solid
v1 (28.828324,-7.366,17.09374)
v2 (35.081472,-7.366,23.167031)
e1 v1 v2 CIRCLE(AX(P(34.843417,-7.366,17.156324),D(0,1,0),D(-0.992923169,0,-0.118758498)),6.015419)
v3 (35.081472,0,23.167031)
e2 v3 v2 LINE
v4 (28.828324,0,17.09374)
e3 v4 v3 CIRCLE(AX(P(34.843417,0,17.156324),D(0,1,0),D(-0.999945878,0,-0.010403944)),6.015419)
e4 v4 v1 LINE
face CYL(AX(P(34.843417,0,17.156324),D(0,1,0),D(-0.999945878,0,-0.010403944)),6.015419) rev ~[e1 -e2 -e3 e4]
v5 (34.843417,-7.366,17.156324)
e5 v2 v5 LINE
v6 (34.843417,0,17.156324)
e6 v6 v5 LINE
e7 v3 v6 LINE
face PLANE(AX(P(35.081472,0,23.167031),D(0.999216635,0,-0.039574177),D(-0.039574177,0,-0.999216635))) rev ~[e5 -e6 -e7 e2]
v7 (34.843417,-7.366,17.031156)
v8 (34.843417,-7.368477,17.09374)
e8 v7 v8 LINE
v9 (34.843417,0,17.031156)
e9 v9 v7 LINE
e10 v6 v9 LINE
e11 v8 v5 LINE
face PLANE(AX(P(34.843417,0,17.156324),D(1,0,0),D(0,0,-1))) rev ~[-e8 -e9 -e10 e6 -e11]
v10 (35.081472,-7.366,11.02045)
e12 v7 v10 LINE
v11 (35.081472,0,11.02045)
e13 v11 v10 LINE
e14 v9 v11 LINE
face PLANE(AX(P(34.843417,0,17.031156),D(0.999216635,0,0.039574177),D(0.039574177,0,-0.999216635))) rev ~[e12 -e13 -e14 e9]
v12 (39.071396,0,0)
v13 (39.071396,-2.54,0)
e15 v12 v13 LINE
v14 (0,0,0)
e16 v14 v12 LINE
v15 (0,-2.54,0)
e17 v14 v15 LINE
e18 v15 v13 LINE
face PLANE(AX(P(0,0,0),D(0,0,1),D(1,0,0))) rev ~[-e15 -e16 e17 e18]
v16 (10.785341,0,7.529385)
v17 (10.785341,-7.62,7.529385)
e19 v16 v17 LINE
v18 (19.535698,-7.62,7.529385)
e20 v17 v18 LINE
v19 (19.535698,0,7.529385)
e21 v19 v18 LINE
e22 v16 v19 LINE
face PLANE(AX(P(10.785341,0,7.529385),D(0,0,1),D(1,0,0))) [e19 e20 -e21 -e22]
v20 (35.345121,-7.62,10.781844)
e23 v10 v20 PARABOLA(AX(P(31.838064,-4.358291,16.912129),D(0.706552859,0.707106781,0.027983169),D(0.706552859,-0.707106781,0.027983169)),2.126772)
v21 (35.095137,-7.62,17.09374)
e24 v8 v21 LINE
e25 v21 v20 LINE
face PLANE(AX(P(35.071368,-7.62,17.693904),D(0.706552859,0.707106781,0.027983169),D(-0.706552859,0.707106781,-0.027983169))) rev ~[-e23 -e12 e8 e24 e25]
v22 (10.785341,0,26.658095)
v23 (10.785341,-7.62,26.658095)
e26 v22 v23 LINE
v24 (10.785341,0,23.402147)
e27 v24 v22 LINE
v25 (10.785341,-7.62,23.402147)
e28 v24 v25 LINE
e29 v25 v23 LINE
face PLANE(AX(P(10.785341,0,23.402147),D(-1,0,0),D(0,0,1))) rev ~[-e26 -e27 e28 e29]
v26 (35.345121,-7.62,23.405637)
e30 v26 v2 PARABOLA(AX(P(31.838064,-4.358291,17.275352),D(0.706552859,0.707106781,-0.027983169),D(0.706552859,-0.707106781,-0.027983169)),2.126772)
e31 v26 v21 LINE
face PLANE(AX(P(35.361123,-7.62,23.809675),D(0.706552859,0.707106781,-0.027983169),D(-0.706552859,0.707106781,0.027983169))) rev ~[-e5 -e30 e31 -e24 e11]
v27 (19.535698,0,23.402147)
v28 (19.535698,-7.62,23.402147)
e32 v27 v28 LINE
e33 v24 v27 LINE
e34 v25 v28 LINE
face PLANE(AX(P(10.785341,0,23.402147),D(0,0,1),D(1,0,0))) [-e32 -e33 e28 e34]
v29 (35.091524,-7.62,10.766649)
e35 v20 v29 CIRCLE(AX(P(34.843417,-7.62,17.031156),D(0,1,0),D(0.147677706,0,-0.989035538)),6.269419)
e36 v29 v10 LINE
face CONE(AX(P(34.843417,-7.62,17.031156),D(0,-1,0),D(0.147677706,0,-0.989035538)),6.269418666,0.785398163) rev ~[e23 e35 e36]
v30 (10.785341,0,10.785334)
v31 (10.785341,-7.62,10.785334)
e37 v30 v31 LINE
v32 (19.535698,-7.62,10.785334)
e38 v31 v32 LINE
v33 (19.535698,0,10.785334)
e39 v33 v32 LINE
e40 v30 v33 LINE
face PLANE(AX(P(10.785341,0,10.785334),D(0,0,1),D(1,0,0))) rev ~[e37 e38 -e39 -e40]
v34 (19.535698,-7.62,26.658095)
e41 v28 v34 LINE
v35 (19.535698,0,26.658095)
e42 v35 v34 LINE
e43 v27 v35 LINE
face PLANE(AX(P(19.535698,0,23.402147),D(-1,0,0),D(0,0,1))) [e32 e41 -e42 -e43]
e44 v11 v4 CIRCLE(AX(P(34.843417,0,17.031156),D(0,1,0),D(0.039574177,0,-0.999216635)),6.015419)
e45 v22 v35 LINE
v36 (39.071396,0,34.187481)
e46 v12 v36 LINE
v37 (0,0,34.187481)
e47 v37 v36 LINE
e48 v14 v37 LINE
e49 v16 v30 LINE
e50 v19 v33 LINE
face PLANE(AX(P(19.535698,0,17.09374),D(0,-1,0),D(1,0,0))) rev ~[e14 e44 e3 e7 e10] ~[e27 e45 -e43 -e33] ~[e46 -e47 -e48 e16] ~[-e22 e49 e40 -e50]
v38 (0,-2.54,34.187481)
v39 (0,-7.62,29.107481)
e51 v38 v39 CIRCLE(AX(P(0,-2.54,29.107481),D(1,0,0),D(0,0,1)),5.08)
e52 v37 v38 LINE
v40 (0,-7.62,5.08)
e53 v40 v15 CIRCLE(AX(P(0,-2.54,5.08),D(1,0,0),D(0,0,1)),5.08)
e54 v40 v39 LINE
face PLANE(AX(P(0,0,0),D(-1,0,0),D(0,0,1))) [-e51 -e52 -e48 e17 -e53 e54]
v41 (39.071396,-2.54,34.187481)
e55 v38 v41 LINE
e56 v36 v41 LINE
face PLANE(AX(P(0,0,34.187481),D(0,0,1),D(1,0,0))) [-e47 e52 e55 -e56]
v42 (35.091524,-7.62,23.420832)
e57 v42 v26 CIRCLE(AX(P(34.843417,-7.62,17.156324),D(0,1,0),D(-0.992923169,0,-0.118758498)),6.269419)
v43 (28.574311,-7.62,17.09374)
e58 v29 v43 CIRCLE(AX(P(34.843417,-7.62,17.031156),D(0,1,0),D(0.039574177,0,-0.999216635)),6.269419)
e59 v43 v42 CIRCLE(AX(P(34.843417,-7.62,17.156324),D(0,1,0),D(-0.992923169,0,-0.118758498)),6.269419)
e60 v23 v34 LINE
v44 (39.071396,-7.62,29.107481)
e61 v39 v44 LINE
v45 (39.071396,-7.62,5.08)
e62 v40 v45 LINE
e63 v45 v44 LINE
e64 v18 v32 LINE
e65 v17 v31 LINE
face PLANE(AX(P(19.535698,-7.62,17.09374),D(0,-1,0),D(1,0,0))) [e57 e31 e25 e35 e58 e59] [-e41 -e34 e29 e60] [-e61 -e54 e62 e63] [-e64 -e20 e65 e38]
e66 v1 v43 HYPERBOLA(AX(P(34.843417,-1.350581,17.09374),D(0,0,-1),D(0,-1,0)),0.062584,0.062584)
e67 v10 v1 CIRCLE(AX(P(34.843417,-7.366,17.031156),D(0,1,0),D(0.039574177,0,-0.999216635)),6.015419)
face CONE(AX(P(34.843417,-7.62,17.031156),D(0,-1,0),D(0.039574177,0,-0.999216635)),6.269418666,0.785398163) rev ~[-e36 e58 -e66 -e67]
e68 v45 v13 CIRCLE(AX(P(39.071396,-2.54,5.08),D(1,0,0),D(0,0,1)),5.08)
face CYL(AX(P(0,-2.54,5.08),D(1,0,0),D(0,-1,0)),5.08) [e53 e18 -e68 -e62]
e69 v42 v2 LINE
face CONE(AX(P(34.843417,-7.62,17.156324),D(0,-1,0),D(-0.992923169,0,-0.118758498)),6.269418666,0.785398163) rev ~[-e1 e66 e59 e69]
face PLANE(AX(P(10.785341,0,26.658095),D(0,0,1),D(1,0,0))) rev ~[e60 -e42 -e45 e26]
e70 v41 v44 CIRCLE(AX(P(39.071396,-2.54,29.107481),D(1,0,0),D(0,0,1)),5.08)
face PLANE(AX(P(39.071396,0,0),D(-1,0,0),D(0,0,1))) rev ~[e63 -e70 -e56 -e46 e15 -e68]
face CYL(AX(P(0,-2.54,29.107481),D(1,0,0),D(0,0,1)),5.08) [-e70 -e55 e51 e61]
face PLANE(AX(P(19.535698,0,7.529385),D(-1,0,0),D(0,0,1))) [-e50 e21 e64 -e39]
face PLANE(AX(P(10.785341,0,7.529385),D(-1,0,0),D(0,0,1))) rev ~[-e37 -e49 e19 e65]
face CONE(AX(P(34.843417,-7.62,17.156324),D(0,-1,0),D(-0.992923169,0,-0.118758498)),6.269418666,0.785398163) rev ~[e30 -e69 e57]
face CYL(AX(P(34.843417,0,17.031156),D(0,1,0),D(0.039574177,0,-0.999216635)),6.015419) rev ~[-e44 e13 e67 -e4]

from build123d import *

# Parameters (mm, degrees)
F0_W         = 39.0713959932
F0_H         = 34.1874808073
F0_W_2       = 8.7503567338
F0_H_2       = 3.2559484243
F1_DEPTH     = 7.62
F2_R         = 5.08
F3_R         = 5.08
F4_T2_ANGLE  = 99.0884829953
F4_T4_ANGLE  = 99.0884829953
F4_T8_DEPTH  = 7.3218336241
F4_S9_R      = 6.0154186662
F4_T10_DEPTH = 5
F4_T14_DEPTH = 7.3218336241
F4_S15_R     = 6.0154186662
F4_T16_DEPTH = 5
F4_T21_DEPTH = 7.3218336241
F4_S22_R     = 6.0154186662
F4_T23_DEPTH = 5
F4_T26_ANGLE = 105.3128275547
F4_T33_ANGLE = 105.3128275547
F4_T37_DEPTH = 7.3218336241
F4_S38_R     = 6.0154186662
F4_T39_DEPTH = 5


# Not quite as in the source:
# - a fillet or chamfer that OpenCascade refuses, or shapes differently, is made with other operations: its cross-section is extruded or revolved along the edge and cut away or added


with BuildPart() as f1:
    # F0 (on Front) → F1 (new body)
    with BuildSketch(Plane.XZ):
        with Locations((19.5356979966, 17.0937404037)):
            Rectangle(F0_W, F0_H)
        with Locations((15.1605196297, 9.1573596001)):
            Rectangle(F0_W_2, F0_H_2, mode=Mode.SUBTRACT)
        with Locations((15.1605196297, 25.0301212072)):
            Rectangle(F0_W_2, F0_H_2, mode=Mode.SUBTRACT)
        with BuildLine():
            ThreePointArc((28.8283239088, 17.0937404037), (30.6523842077, 21.4714728973), (35.0814722478, 23.1670308858))
            Line((35.0814722478, 23.1670308858), (34.8434170056, 17.1563244854))
            Line((34.8434170056, 17.1563244854), (34.8434170056, 17.0311563219))
            Line((34.8434170056, 17.0311563219), (35.0814722478, 11.0204499215))
            ThreePointArc((35.0814722478, 11.0204499215), (30.6523842077, 12.71600791), (28.8283239088, 17.0937404037))
        make_face(mode=Mode.SUBTRACT)
    extrude(amount=F1_DEPTH)

    # F2
    f2_edges = [f1.edges().sort_by_distance(p)[0] for p in [
        (19.535698, -7.62, 34.187481),
    ]]
    fillet(f2_edges, radius=F2_R)

    # F3
    f3_edges = [f1.edges().sort_by_distance(p)[0] for p in [
        (19.535698, -7.62, 0),
    ]]
    fillet(f3_edges, radius=F3_R)

    # F4: chamfer of 0.254 on 4 edges, made by hand

    # F4_s1 → F4_t2 (revolve, cut)
    with BuildSketch(Plane(origin=(35.4623142005, 0, 1.4044921235), x_dir=(0, 1, 0), z_dir=(0.9992166354, 0, 0.0395741769))):
        Polygon((-7.62, 9.3694965041), (-7.366, 9.6234965041), (-7.62, 9.6234965041), align=None)
    revolve(axis=Axis((34.8434170056, -7.62, 17.0311563219), (0, 1, 0)), revolution_arc=F4_T2_ANGLE, mode=Mode.SUBTRACT)

    # F4_s3 → F4_t4 (revolve, cut)
    with BuildSketch(Plane(origin=(-1.5316236266, 0, 12.8056905764), x_dir=(0, 1, 0), z_dir=(0.1187584985, 0, -0.9929231688))):
        Polygon((-7.62, 30.3648766921), (-7.366, 30.6188766921), (-7.62, 30.6188766921), align=None)
    revolve(axis=Axis((34.8434170056, -7.62, 17.1563244854), (0, 1, 0)), revolution_arc=F4_T4_ANGLE, mode=Mode.SUBTRACT)


with BuildPart() as f4_tool6:
    # F4_s7 → F4_t8 (new body)
    with BuildSketch(Plane(origin=(0.9968897612, 0, 25.170677246), x_dir=(0, 1, 0), z_dir=(-0.0395741769, 0, -0.9992166354))):
        Polygon((-7.62, 34.3911744878), (-7.366, 34.1371744878), (-7.62, 34.1371744878), align=None)
    extrude(amount=F4_T8_DEPTH)

    # F4_s9 → F4_t10 (intersect, symmetric)
    with BuildSketch(Plane.XZ.offset(7.5)):
        with Locations((34.8434170056, 17.1563244854)):
            Circle(F4_S9_R)
    extrude(amount=F4_T10_DEPTH, both=True, mode=Mode.INTERSECT)


with BuildPart() as f1_1:
    add(f1.part)

    # F4_t5: cut F4_tool6
    add(f4_tool6.part, mode=Mode.SUBTRACT)


with BuildPart() as f4_tool12:
    # F4_s13 → F4_t14 (new body)
    with BuildSketch(Plane(origin=(-0.6447473432, 0, 16.2793599777), x_dir=(0, 1, 0), z_dir=(0.0395741769, 0, -0.9992166354))):
        Polygon((-7.62, 35.7441158998), (-7.366, 35.4901158998), (-7.62, 35.4901158998), align=None)
    extrude(amount=F4_T14_DEPTH)

    # F4_s15 → F4_t16 (intersect, symmetric)
    with BuildSketch(Plane.XZ.offset(7.5)):
        with Locations((34.8434170056, 17.0311563219)):
            Circle(F4_S15_R)
    extrude(amount=F4_T16_DEPTH, both=True, mode=Mode.INTERSECT)


with BuildPart() as f1_2:
    add(f1_1.part)

    # F4_t11: cut F4_tool12
    add(f4_tool12.part, mode=Mode.SUBTRACT)


with BuildPart() as f4_tool19:
    # F4_s20 → F4_t21 (new body)
    with BuildSketch(Plane(origin=(-0.6447473432, 0, 16.2793599777), x_dir=(0, 1, 0), z_dir=(0.0395741769, 0, -0.9992166354))):
        Polygon((-7.62, 35.7441158998), (-7.366, 35.4901158998), (-7.62, 35.4901158998), align=None)
    extrude(amount=F4_T21_DEPTH)

    # F4_s22 → F4_t23 (cut, symmetric)
    with BuildSketch(Plane.XZ.offset(7.5)):
        with Locations((34.8434170056, 17.0311563219)):
            Circle(F4_S22_R)
    extrude(amount=F4_T23_DEPTH, both=True, mode=Mode.SUBTRACT)


with BuildPart() as f4_tool24:
    # F4_s25 → F4_t26 (revolve)
    with BuildSketch(Plane(origin=(36.5710723448, 0, 5.4606046716), x_dir=(0, 1, 0), z_dir=(0.9890355378, 0, 0.1476777062))):
        Polygon((-7.62, 5.4294042858), (-7.366, 5.6834042858), (-7.62, 5.6834042858), align=None)
    revolve(axis=Axis((34.8434170056, -7.62, 17.0311563219), (0, 1, 0)), revolution_arc=F4_T26_ANGLE)

    split(bisect_by=Plane(origin=(35.4623142005, 0, 1.4044921235), x_dir=(0, 1, 0), z_dir=(0.9992166354, 0, 0.0395741769)), keep=Keep.TOP)


with BuildPart() as f4_tool19_1:
    add(f4_tool19.part)

    # F4_t28: intersect F4_tool24
    add(f4_tool24.part, mode=Mode.INTERSECT)


with BuildPart() as f1_3:
    add(f1_2.part)

    # F4_t17: cut F4_tool19
    add(f4_tool19_1.part, mode=Mode.SUBTRACT)


with BuildPart() as f4_tool31:
    # F4_s32 → F4_t33 (revolve)
    with BuildSketch(Plane(origin=(-1.5316236266, 0, 12.8056905764), x_dir=(0, 1, 0), z_dir=(0.1187584985, 0, -0.9929231688))):
        Polygon((-7.62, 30.3648766921), (-7.366, 30.6188766921), (-7.62, 30.6188766921), align=None)
    revolve(axis=Axis((34.8434170056, -7.62, 17.1563244854), (0, 1, 0)), revolution_arc=F4_T33_ANGLE)

    split(bisect_by=Plane(origin=(34.1104326349, 0, -1.3509505808), x_dir=(0, 1, 0), z_dir=(0.9992166354, 0, -0.0395741769)), keep=Keep.TOP)


with BuildPart() as f4_tool35:
    # F4_s36 → F4_t37 (new body)
    with BuildSketch(Plane(origin=(0.9968897612, 0, 25.170677246), x_dir=(0, 1, 0), z_dir=(-0.0395741769, 0, -0.9992166354))):
        Polygon((-7.62, 34.3911744878), (-7.366, 34.1371744878), (-7.62, 34.1371744878), align=None)
    extrude(amount=F4_T37_DEPTH)

    # F4_s38 → F4_t39 (cut, symmetric)
    with BuildSketch(Plane.XZ.offset(7.5)):
        with Locations((34.8434170056, 17.1563244854)):
            Circle(F4_S38_R)
    extrude(amount=F4_T39_DEPTH, both=True, mode=Mode.SUBTRACT)


with BuildPart() as f4_tool31_1:
    add(f4_tool31.part)

    # F4_t40: intersect F4_tool35
    add(f4_tool35.part, mode=Mode.INTERSECT)


with BuildPart() as f1_4:
    add(f1_3.part)

    # F4_t29: cut F4_tool31
    add(f4_tool31_1.part, mode=Mode.SUBTRACT)


solid = f1_4.part
